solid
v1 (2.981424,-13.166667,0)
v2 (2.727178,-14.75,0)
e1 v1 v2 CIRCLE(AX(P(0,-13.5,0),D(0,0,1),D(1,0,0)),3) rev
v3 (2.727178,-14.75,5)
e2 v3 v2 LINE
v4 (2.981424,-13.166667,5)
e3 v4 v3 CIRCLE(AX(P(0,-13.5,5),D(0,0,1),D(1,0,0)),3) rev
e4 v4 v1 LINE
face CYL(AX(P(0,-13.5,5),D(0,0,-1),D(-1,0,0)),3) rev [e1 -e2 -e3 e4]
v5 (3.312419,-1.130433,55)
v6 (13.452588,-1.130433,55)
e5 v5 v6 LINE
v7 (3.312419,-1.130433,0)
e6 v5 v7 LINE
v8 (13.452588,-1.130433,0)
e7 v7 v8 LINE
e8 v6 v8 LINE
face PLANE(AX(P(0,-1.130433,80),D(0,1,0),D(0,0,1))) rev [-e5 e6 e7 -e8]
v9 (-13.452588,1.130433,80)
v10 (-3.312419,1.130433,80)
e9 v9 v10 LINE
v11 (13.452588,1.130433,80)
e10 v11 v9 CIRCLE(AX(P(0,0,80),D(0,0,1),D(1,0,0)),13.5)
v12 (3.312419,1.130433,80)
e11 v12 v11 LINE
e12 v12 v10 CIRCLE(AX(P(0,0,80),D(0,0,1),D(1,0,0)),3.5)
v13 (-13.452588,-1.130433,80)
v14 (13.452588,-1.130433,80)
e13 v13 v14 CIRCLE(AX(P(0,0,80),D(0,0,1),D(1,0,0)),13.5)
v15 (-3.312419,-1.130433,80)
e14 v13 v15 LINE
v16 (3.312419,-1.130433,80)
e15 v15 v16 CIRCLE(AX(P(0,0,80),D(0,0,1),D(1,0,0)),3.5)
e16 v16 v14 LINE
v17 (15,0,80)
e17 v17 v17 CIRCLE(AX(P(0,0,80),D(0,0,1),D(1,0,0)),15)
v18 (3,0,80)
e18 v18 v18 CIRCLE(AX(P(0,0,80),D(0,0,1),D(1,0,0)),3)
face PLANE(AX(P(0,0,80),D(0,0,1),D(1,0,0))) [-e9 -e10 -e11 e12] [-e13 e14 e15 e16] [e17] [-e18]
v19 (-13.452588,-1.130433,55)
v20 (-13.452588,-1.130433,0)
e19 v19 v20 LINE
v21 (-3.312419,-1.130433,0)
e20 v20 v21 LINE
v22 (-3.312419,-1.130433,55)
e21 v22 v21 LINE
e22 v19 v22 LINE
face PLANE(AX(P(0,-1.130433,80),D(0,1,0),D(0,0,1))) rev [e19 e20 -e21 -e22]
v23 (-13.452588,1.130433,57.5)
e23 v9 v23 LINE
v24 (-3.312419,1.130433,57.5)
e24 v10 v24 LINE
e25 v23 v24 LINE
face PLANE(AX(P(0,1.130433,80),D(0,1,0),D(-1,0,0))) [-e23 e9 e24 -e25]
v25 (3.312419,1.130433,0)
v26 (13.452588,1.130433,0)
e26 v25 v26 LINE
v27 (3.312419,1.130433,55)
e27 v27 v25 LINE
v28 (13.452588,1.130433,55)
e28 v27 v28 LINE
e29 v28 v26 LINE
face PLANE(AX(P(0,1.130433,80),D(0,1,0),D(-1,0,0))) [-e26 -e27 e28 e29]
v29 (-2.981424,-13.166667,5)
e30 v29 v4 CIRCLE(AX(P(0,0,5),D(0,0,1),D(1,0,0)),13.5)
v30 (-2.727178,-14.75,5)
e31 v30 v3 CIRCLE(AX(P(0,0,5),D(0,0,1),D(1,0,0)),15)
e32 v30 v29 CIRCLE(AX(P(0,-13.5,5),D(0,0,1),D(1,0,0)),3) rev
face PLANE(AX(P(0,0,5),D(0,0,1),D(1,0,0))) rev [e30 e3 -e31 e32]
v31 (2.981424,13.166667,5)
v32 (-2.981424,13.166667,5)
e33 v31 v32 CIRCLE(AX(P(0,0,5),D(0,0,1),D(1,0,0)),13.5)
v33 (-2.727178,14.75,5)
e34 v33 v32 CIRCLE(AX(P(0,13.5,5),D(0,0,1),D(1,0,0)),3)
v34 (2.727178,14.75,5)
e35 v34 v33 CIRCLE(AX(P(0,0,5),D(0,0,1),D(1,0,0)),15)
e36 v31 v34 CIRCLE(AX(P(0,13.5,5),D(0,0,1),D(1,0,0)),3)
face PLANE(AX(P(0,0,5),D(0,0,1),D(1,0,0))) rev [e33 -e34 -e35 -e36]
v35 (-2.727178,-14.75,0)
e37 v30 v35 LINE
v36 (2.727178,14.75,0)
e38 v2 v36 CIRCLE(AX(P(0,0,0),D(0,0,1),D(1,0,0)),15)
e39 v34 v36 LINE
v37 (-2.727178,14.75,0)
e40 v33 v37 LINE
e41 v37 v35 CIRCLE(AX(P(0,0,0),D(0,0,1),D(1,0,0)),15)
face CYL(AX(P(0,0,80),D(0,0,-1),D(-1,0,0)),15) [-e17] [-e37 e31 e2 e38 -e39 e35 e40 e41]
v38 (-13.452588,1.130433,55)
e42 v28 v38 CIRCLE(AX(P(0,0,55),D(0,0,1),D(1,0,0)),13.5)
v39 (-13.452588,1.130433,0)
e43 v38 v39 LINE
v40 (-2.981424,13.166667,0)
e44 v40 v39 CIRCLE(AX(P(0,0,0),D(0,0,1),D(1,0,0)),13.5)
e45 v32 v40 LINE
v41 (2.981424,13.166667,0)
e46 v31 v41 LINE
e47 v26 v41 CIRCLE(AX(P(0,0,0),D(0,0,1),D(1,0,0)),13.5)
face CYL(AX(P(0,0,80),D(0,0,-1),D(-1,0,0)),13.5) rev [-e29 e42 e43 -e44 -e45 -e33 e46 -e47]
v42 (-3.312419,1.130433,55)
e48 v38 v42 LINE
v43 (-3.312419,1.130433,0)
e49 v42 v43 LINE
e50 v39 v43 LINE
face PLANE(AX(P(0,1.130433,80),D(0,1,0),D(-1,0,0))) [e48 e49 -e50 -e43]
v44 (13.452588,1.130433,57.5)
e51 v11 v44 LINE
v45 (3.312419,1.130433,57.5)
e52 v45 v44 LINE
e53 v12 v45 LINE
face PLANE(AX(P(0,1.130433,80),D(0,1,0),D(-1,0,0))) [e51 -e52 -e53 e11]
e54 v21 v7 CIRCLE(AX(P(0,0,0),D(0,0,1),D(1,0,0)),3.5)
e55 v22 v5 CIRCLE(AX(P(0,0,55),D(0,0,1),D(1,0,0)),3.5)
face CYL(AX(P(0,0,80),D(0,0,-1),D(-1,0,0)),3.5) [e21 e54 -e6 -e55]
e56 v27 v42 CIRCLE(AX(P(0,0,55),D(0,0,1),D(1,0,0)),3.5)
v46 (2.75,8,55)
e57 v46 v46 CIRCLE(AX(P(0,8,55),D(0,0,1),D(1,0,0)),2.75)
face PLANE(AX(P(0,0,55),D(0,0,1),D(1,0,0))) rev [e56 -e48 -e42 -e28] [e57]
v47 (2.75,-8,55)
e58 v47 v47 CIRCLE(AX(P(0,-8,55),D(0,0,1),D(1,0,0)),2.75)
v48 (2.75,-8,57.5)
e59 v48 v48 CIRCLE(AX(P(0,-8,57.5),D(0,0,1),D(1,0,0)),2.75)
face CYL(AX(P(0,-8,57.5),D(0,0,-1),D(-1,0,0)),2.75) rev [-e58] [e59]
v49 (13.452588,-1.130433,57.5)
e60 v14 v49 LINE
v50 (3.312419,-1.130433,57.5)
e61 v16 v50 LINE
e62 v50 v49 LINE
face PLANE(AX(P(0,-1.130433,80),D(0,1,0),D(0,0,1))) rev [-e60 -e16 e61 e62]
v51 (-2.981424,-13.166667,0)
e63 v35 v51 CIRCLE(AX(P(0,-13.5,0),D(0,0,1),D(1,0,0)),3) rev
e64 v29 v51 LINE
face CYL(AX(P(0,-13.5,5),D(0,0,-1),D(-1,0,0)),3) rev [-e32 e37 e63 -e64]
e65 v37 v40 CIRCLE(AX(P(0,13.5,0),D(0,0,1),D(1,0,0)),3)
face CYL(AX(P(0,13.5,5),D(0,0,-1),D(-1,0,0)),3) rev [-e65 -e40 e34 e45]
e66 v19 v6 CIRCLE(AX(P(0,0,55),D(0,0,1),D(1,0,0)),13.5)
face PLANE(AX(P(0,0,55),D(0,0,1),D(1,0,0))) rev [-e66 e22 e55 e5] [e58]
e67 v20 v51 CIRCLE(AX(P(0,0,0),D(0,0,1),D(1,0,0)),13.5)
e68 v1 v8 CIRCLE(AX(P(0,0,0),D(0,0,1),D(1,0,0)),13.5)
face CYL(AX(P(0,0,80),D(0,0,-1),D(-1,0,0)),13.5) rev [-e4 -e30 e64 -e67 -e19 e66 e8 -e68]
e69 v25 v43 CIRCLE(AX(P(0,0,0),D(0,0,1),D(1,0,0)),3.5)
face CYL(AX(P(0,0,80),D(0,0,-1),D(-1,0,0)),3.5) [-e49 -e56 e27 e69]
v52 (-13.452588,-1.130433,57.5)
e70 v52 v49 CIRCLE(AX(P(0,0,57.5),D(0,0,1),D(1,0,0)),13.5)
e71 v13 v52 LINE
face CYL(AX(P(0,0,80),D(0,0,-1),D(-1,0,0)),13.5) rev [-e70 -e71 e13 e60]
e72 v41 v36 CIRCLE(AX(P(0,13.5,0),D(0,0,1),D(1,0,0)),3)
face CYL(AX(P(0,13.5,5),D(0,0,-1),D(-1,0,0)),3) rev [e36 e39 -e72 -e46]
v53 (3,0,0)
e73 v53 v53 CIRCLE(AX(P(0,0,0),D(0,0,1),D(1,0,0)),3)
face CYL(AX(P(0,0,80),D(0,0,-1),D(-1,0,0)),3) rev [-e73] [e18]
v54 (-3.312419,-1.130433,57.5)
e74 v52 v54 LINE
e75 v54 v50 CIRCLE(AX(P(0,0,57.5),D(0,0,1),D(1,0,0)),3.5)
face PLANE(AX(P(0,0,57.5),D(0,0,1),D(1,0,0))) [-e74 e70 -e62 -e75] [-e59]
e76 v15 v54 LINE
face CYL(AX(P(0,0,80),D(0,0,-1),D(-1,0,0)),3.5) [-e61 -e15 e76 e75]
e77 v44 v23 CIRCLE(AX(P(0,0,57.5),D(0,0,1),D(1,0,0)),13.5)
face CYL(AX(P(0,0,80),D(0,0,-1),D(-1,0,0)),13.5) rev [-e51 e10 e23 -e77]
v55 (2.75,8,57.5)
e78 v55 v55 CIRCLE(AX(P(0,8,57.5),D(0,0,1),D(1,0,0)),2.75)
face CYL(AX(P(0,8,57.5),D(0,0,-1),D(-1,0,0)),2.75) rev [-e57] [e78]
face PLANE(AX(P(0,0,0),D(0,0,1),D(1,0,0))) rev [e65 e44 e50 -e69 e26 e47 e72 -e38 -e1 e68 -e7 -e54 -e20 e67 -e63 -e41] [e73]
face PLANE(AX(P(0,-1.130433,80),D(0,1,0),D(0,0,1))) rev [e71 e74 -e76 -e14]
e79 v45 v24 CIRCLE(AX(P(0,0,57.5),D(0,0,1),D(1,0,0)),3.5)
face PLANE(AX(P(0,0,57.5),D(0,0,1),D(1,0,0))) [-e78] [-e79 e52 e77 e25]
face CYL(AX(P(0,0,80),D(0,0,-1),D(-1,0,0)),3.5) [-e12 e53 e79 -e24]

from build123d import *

# Parameters (mm, degrees)
SKETCH2_R              = 15
SKETCH2_R_2            = 13.5
SKETCH2_R_3            = 3
SHELL_DEPTH            = 80
SKETCH8_R              = 2.75
INNERPARTITION_DEPTH   = 2.5
MOVE_START             = 40
MOVE_FACE6_OUTLINE_R   = 2.75
MOVE_FACE6_DEPTH       = 2.5
MOVE_START_2           = 55
MOVE_FACE6_2_OUTLINE_R = 2.75
MOVE_FACE6_2_DEPTH     = 2.5
EASIER_ASSEMBLY_DEPTH  = 5


# Read off the part's stored shape, not the designer's step: Move Face6
with BuildPart() as part:
    # Sketch2 → Shell (new body)
    # profile 1 of 6: a face of its own
    with BuildSketch(Plane.XY):
        Circle(SKETCH2_R)
        Circle(SKETCH2_R_2, mode=Mode.SUBTRACT)
    # profile 2 of 6: a face of its own
    with BuildSketch(Plane.XY):
        with BuildLine():
            ThreePointArc((-2.727178029, 14.75), (-2.962055082, 13.975636094), (-2.98142397, 13.166666667))
            ThreePointArc((-2.98142397, 13.166666667), (0, 13.5), (2.98142397, 13.166666667))
            ThreePointArc((2.98142397, 13.166666667), (2.962055082, 13.975636094), (2.727178029, 14.75))
            ThreePointArc((2.727178029, 14.75), (0, 15), (-2.727178029, 14.75))
        make_face()
    # profile 3 of 6: a face of its own
    with BuildSketch(Plane.XY):
        with BuildLine():
            ThreePointArc((-13.452587926, -1.130432705), (-13.5, 0), (-13.452587926, 1.130432705))
            ThreePointArc((-13.452587926, 1.130432705), (-10.18513224, 8.860760761), (-2.98142397, 13.166666667))
            ThreePointArc((-2.98142397, 13.166666667), (-2.962055082, 13.975636094), (-2.727178029, 14.75))
            ThreePointArc((-2.727178029, 14.75), (-15, 0), (-2.727178029, -14.75))
            ThreePointArc((-2.727178029, -14.75), (-2.962055082, -13.975636094), (-2.98142397, -13.166666667))
            ThreePointArc((-2.98142397, -13.166666667), (-10.18513224, -8.860760761), (-13.452587926, -1.130432705))
        make_face()
    # profile 4 of 6: a face of its own
    with BuildSketch(Plane.XY):
        with BuildLine():
            ThreePointArc((2.727178029, 14.75), (2.962055082, 13.975636094), (2.98142397, 13.166666667))
            ThreePointArc((2.98142397, 13.166666667), (10.18513224, 8.860760761), (13.452587926, 1.130432705))
            ThreePointArc((13.452587926, 1.130432705), (13.488141773, 0.565713268), (13.5, 0))
            ThreePointArc((13.5, 0), (13.488141773, -0.565713268), (13.452587926, -1.130432705))
            ThreePointArc((13.452587926, -1.130432705), (10.18513224, -8.860760761), (2.98142397, -13.166666667))
            ThreePointArc((2.98142397, -13.166666667), (2.962055082, -13.975636094), (2.727178029, -14.75))
            ThreePointArc((2.727178029, -14.75), (11.530560924, -9.594069251), (15, 0))
            ThreePointArc((15, 0), (11.530560924, 9.594069251), (2.727178029, 14.75))
        make_face()
    # profile 5 of 6: a face of its own
    with BuildSketch(Plane.XY):
        with BuildLine():
            ThreePointArc((2.98142397, -13.166666667), (0, -13.5), (-2.98142397, -13.166666667))
            ThreePointArc((-2.98142397, -13.166666667), (-2.962055082, -13.975636094), (-2.727178029, -14.75))
            ThreePointArc((-2.727178029, -14.75), (0, -15), (2.727178029, -14.75))
            ThreePointArc((2.727178029, -14.75), (2.962055082, -13.975636094), (2.98142397, -13.166666667))
        make_face()
    # profile 6 of 6: a face of its own
    with BuildSketch(Plane.XY):
        with BuildLine():
            Line((-3.312419342, 1.130432705), (-13.452587926, 1.130432705))
            ThreePointArc((-13.452587926, 1.130432705), (-13.5, 0), (-13.452587926, -1.130432705))
            Line((-13.452587926, -1.130432705), (-3.312419342, -1.130432705))
            ThreePointArc((-3.312419342, -1.130432705), (0, -3.5), (3.312419342, -1.130432705))
            Line((3.312419342, -1.130432705), (13.452587926, -1.130432705))
            ThreePointArc((13.452587926, -1.130432705), (13.488141773, -0.565713268), (13.5, 0))
            ThreePointArc((13.5, 0), (13.488141773, 0.565713268), (13.452587926, 1.130432705))
            Line((13.452587926, 1.130432705), (3.312419342, 1.130432705))
            ThreePointArc((3.312419342, 1.130432705), (0, 3.5), (-3.312419342, 1.130432705))
        make_face()
        Circle(SKETCH2_R_3, mode=Mode.SUBTRACT)
    extrude(amount=SHELL_DEPTH)

    # Sketch8 → InnerPartition (add)
    # profile 1 of 2: a face of its own
    with BuildSketch(Plane.XY.offset(40)):
        with BuildLine():
            ThreePointArc((13.452587926, 1.130432705), (0, 13.5), (-13.452587926, 1.130432705))
            Line((-13.452587926, 1.130432705), (-3.312419342, 1.130432705))
            ThreePointArc((-3.312419342, 1.130432705), (0, 3.5), (3.312419342, 1.130432705))
            Line((3.312419342, 1.130432705), (13.452587926, 1.130432705))
        make_face()
        with Locations((0, 8)):
            Circle(SKETCH8_R, mode=Mode.SUBTRACT)
    # profile 2 of 2: a face of its own
    with BuildSketch(Plane.XY.offset(40)):
        with BuildLine():
            Line((-3.312419342, -1.130432705), (-13.452587926, -1.130432705))
            ThreePointArc((-13.452587926, -1.130432705), (0, -13.5), (13.452587926, -1.130432705))
            Line((13.452587926, -1.130432705), (3.312419342, -1.130432705))
            ThreePointArc((3.312419342, -1.130432705), (0, -3.5), (-3.312419342, -1.130432705))
        make_face()
        with Locations((0, -8)):
            Circle(SKETCH8_R, mode=Mode.SUBTRACT)
    extrude(amount=INNERPARTITION_DEPTH)

    # Move Face6 outline → Move Face6 (cut)
    # profile 1 of 2: a face of its own
    with BuildSketch(Plane.XY.offset(MOVE_START)):
        with BuildLine():
            ThreePointArc((-13.452587926, -1.130432705), (0, -13.5), (13.452587926, -1.130432705))
            Line((13.452587926, -1.130432705), (3.312419342, -1.130432705))
            ThreePointArc((3.312419342, -1.130432705), (0, -3.5), (-3.312419342, -1.130432705))
            Line((-3.312419342, -1.130432705), (-13.452587926, -1.130432705))
        make_face()
        with Locations((0, -8)):
            Circle(MOVE_FACE6_OUTLINE_R, mode=Mode.SUBTRACT)
    # profile 2 of 2: a face of its own
    with BuildSketch(Plane.XY.offset(MOVE_START)):
        with BuildLine():
            ThreePointArc((13.452587926, 1.130432705), (0, 13.5), (-13.452587926, 1.130432705))
            Line((-13.452587926, 1.130432705), (-3.312419342, 1.130432705))
            ThreePointArc((-3.312419342, 1.130432705), (0, 3.5), (3.312419342, 1.130432705))
            Line((3.312419342, 1.130432705), (13.452587926, 1.130432705))
        make_face()
        with Locations((0, 8)):
            Circle(MOVE_FACE6_OUTLINE_R, mode=Mode.SUBTRACT)
    extrude(amount=MOVE_FACE6_DEPTH, mode=Mode.SUBTRACT)

    # Move Face6 2 outline → Move Face6 2 (add)
    # profile 1 of 2: a face of its own
    with BuildSketch(Plane.XY.offset(MOVE_START_2)):
        with BuildLine():
            ThreePointArc((-13.452587926, -1.130432705), (0, -13.5), (13.452587926, -1.130432705))
            Line((13.452587926, -1.130432705), (3.312419342, -1.130432705))
            ThreePointArc((3.312419342, -1.130432705), (0, -3.5), (-3.312419342, -1.130432705))
            Line((-3.312419342, -1.130432705), (-13.452587926, -1.130432705))
        make_face()
        with Locations((0, -8)):
            Circle(MOVE_FACE6_2_OUTLINE_R, mode=Mode.SUBTRACT)
    # profile 2 of 2: a face of its own
    with BuildSketch(Plane.XY.offset(MOVE_START_2)):
        with BuildLine():
            ThreePointArc((13.452587926, 1.130432705), (0, 13.5), (-13.452587926, 1.130432705))
            Line((-13.452587926, 1.130432705), (-3.312419342, 1.130432705))
            ThreePointArc((-3.312419342, 1.130432705), (0, 3.5), (3.312419342, 1.130432705))
            Line((3.312419342, 1.130432705), (13.452587926, 1.130432705))
        make_face()
        with Locations((0, 8)):
            Circle(MOVE_FACE6_2_OUTLINE_R, mode=Mode.SUBTRACT)
    extrude(amount=MOVE_FACE6_2_DEPTH)

    # Sketch2<12> → Easier assembly (cut)
    with BuildSketch(Plane.XY):
        with BuildLine():
            ThreePointArc((-2.727178029, 14.75), (-2.962055082, 13.975636094), (-2.98142397, 13.166666667))
            ThreePointArc((-2.98142397, 13.166666667), (0, 13.5), (2.98142397, 13.166666667))
            ThreePointArc((2.98142397, 13.166666667), (2.962055082, 13.975636094), (2.727178029, 14.75))
            ThreePointArc((2.727178029, 14.75), (0, 15), (-2.727178029, 14.75))
        make_face()
        with BuildLine():
            ThreePointArc((2.98142397, -13.166666667), (0, -13.5), (-2.98142397, -13.166666667))
            ThreePointArc((-2.98142397, -13.166666667), (-2.962055082, -13.975636094), (-2.727178029, -14.75))
            ThreePointArc((-2.727178029, -14.75), (0, -15), (2.727178029, -14.75))
            ThreePointArc((2.727178029, -14.75), (2.962055082, -13.975636094), (2.98142397, -13.166666667))
        make_face()
    extrude(amount=EASIER_ASSEMBLY_DEPTH, mode=Mode.SUBTRACT)


solid = part.part
